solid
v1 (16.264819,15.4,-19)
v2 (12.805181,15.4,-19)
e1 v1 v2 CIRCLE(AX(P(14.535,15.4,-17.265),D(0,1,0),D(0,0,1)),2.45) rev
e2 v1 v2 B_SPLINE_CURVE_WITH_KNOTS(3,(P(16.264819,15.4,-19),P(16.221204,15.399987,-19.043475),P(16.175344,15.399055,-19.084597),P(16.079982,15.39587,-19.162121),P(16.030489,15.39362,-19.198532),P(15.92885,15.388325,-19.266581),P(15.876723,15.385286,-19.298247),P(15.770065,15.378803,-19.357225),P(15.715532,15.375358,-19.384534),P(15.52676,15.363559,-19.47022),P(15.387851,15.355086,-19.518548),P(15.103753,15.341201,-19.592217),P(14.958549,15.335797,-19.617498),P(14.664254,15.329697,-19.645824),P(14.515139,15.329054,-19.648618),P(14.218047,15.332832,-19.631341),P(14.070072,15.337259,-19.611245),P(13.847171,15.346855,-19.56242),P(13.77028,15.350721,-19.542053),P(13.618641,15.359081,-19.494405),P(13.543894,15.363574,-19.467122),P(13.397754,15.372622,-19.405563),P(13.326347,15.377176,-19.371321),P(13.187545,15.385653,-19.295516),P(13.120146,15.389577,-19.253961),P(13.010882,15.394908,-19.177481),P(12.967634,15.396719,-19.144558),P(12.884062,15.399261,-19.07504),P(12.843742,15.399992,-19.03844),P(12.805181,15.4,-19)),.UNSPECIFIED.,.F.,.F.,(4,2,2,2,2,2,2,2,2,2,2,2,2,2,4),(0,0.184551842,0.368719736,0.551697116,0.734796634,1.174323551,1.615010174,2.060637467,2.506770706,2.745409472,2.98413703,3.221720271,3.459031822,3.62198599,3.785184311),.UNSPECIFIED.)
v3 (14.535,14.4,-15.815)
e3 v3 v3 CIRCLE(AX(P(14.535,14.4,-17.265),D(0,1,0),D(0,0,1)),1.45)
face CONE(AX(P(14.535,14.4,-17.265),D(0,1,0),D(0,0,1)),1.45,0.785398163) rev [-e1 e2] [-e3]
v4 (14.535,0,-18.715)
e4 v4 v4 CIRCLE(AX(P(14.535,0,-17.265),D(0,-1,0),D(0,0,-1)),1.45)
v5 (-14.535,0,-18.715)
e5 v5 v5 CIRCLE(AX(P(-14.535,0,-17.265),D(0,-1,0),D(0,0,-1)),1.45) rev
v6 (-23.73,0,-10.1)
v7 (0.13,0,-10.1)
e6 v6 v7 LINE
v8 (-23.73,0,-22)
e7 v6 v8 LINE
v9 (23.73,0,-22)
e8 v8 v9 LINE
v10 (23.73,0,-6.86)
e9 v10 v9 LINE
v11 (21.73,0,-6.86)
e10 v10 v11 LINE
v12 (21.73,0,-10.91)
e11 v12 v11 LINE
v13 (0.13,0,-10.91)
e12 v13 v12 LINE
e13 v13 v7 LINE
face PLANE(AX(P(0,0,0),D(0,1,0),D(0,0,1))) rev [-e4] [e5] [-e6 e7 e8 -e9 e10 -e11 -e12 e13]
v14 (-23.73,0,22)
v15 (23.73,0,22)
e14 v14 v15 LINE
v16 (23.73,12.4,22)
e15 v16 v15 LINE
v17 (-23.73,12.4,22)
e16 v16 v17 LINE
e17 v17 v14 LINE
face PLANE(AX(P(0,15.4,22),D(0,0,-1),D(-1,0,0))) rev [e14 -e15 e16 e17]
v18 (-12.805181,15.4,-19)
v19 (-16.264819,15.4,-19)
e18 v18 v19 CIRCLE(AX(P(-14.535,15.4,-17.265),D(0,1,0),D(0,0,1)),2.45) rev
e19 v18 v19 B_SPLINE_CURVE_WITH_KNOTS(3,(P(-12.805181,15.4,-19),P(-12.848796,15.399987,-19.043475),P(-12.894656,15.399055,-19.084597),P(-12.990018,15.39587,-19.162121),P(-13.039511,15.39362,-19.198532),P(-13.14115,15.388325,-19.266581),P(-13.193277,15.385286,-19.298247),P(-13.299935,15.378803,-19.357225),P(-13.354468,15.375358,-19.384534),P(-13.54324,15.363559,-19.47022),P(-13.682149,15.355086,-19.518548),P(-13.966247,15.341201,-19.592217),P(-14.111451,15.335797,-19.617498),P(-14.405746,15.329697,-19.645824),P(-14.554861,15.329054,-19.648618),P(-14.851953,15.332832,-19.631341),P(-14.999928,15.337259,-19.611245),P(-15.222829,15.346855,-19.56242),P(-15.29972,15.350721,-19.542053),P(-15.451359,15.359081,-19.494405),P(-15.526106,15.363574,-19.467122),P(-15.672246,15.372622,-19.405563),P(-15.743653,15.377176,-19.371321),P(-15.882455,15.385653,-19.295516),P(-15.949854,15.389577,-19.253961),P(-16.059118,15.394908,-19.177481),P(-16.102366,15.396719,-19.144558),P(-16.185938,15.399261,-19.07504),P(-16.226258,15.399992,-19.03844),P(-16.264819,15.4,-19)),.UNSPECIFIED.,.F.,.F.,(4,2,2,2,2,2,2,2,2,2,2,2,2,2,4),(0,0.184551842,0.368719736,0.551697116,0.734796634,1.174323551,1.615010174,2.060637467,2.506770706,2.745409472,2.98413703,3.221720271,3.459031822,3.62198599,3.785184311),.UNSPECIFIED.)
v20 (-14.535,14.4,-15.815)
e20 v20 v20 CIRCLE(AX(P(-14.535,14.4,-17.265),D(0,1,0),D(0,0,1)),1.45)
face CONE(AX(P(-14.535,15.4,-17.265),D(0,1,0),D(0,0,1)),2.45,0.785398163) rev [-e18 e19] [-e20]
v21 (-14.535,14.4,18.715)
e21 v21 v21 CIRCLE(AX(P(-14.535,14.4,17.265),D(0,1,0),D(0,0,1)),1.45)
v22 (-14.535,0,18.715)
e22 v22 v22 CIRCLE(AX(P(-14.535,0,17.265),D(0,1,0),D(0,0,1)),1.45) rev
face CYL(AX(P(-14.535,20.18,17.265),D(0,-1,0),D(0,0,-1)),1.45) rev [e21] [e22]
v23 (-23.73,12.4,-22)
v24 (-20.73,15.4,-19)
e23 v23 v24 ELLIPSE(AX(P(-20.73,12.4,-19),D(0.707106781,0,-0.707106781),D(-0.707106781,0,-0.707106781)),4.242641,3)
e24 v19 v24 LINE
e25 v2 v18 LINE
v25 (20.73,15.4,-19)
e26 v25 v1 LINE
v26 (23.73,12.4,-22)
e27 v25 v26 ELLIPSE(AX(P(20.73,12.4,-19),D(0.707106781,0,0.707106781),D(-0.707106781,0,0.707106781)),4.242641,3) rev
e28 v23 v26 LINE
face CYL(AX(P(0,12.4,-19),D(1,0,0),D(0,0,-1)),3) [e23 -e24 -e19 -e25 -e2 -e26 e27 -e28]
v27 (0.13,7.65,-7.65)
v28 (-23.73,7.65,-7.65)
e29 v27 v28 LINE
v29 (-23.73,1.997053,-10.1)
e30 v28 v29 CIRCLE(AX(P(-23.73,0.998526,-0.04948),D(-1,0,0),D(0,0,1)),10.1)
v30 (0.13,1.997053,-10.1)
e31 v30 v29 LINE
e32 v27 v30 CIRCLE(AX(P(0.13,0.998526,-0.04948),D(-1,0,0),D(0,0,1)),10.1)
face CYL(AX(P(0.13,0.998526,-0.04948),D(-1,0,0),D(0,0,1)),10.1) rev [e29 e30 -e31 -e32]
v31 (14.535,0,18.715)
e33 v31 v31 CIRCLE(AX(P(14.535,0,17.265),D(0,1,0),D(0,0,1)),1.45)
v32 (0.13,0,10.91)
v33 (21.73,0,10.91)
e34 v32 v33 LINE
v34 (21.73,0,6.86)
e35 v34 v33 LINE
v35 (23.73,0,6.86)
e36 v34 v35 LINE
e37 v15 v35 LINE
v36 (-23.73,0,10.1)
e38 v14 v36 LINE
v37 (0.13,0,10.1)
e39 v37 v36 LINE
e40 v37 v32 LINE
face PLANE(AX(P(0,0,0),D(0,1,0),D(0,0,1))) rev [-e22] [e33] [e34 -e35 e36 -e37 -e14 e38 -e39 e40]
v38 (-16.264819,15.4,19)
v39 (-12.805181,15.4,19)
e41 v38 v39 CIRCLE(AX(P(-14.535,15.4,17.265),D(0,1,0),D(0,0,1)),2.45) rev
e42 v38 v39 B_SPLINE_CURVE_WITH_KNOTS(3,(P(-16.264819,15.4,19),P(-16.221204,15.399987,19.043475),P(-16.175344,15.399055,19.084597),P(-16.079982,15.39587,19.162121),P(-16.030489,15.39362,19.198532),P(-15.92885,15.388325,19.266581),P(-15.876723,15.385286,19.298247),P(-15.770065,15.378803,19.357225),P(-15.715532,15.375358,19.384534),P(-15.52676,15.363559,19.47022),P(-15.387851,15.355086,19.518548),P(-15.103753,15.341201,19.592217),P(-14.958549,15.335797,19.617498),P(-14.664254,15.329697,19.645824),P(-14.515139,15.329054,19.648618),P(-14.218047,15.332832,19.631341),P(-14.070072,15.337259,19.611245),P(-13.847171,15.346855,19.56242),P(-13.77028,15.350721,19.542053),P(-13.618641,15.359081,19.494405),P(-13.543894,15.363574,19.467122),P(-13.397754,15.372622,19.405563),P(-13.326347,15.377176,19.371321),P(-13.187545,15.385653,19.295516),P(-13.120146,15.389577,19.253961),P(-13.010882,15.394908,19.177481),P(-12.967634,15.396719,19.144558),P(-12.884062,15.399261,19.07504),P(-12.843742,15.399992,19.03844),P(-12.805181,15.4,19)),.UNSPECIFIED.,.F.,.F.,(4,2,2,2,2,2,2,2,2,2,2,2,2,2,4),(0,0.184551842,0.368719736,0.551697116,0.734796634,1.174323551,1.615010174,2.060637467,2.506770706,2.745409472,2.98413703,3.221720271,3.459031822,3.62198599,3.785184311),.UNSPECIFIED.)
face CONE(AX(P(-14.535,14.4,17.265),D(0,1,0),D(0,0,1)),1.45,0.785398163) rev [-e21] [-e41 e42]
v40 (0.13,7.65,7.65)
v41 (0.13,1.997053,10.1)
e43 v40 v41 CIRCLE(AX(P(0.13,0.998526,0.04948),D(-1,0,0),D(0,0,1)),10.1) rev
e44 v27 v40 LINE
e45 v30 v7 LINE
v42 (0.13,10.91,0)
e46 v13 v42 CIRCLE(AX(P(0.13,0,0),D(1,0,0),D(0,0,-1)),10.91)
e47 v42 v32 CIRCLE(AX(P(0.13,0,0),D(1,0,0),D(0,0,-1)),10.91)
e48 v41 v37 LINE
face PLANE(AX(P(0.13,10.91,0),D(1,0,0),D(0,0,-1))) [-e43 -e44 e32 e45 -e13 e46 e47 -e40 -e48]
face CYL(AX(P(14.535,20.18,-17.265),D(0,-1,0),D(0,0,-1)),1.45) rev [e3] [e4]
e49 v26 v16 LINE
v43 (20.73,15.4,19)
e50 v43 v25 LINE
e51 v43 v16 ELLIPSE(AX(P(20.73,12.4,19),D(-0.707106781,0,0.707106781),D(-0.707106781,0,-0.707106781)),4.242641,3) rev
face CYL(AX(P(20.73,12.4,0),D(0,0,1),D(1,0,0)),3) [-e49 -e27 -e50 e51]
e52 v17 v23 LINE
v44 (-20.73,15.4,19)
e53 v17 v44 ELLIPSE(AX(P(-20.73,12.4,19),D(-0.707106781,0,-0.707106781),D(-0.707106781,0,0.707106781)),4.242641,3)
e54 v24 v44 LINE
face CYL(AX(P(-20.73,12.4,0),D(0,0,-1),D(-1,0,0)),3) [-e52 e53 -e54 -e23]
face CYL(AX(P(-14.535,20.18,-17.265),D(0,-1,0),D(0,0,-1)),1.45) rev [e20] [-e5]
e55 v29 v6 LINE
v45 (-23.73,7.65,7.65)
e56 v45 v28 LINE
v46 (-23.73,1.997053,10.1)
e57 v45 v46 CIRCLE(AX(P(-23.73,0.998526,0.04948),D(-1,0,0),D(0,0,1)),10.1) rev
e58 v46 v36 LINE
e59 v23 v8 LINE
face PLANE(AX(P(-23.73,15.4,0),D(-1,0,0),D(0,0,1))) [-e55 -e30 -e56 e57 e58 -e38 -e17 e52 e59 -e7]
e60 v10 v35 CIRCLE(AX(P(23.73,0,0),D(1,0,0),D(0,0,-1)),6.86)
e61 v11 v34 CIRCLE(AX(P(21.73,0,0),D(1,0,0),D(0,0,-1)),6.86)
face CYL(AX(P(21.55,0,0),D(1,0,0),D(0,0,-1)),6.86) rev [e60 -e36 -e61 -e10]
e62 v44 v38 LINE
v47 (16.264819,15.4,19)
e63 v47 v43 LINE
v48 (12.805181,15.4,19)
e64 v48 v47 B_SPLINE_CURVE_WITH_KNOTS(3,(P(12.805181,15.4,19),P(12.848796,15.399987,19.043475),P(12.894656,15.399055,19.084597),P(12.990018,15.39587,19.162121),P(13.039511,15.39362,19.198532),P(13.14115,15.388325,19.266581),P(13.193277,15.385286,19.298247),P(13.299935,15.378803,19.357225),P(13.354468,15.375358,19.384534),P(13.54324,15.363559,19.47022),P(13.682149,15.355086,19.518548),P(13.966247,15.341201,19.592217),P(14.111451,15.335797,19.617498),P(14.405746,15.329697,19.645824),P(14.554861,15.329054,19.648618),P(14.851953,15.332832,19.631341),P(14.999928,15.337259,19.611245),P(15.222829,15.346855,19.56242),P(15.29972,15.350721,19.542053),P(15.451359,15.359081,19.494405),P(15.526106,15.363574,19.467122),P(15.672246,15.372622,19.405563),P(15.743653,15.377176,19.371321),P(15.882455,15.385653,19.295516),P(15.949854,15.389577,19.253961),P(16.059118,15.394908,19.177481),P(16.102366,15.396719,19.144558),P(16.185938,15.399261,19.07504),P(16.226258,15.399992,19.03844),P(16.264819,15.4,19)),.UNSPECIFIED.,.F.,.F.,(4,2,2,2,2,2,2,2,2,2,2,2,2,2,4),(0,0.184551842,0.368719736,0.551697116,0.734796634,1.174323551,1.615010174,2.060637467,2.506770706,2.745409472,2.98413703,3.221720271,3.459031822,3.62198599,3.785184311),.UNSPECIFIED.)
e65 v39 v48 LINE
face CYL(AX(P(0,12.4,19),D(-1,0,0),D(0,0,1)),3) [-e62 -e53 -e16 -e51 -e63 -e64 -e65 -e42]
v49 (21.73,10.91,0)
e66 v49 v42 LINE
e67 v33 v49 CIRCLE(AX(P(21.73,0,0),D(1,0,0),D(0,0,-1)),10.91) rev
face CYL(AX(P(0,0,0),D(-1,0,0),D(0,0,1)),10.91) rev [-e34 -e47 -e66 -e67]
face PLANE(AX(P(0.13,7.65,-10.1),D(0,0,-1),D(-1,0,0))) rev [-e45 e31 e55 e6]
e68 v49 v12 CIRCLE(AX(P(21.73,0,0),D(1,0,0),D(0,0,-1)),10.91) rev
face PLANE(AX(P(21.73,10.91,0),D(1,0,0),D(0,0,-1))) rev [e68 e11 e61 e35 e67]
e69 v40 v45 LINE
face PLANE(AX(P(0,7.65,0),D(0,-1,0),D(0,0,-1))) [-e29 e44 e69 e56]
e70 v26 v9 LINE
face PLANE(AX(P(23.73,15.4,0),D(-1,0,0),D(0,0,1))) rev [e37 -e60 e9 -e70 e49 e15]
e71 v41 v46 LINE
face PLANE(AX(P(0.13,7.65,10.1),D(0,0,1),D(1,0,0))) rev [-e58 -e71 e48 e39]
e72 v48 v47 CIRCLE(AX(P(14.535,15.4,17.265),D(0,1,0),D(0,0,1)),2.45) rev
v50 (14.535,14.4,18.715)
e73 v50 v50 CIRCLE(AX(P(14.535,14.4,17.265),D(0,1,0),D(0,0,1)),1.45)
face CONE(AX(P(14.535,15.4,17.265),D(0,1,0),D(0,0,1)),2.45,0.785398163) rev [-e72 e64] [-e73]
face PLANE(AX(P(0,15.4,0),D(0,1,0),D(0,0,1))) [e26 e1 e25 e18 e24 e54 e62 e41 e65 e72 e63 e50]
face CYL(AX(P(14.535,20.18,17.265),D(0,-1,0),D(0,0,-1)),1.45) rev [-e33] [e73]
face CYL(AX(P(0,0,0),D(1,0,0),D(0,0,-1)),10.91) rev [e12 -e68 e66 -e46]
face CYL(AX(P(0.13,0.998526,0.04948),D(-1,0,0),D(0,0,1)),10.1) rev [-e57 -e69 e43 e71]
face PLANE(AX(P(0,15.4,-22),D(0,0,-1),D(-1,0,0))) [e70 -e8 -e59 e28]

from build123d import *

# Parameters (mm, degrees)
SKETCH1_W           = 47.46
SKETCH1_H           = 44
BOSS_EXTRUDE1_DEPTH = 15.4
SKETCH2_W           = 21.6
SKETCH2_H           = 21.82
CUT_EXTRUDE1_DEPTH  = 10.91
FILLET1_R           = 10.91
SKETCH4_W           = 23.86
SKETCH4_H           = 20.2
CUT_EXTRUDE2_DEPTH  = 7.65
SKETCH8_R           = 1.45
CUT_EXTRUDE3_DEPTH  = 20.18
CHAMFER1_SIZE       = 1
FILLET2_R           = 3
SKETCH9_R           = 6.86
CUT_EXTRUDE4_DEPTH  = 2.18
BOSS_EXTRUDE3_DEPTH = 23.86


# Some blends are built 0.0001 mm under size
with BuildPart() as part:
    # Sketch1 → Boss-Extrude1 (new body)
    with BuildSketch(Plane(origin=(0, 0, 0), x_dir=(1, 0, 0), z_dir=(0, 1, 0))):
        Rectangle(SKETCH1_W, SKETCH1_H)
    extrude(amount=BOSS_EXTRUDE1_DEPTH)

    # Sketch2 → Cut-Extrude1 (cut)
    with BuildSketch(Plane.XZ):
        with Locations((10.93, 0)):
            Rectangle(SKETCH2_W, SKETCH2_H)
    extrude(amount=-CUT_EXTRUDE1_DEPTH, mode=Mode.SUBTRACT)

    # Fillet1
    fillet1_edges = [part.edges().sort_by_distance(p)[0] for p in [
        (10.93, 10.91, -10.91),
        (10.93, 10.91, 10.91),
    ]]
    fillet(fillet1_edges, radius=FILLET1_R - 0.0001)  # a hair under: the kernel refuses the full size

    # Sketch4 → Cut-Extrude2 (cut)
    with BuildSketch(Plane.XZ):
        with Locations((-11.8, 0)):
            Rectangle(SKETCH4_W, SKETCH4_H)
    extrude(amount=-CUT_EXTRUDE2_DEPTH, mode=Mode.SUBTRACT)

    # Sketch8 → Cut-Extrude3 (cut)
    with BuildSketch(Plane.XZ):
        with Locations(Location((14.535, -17.265, 0), (0, 0, 270))):
            Circle(SKETCH8_R)
        with Locations(Location((-14.535, -17.265, 0), (0, 0, 270))):
            Circle(SKETCH8_R)
    cut_extrude3 = extrude(amount=-CUT_EXTRUDE3_DEPTH, mode=Mode.SUBTRACT)

    # Mirror1: Cut-Extrude3 across plane
    add(cut_extrude3.mirror(Plane(origin=(0, 0, 0), x_dir=(1, 0, 0), z_dir=(0, 0, -1))), mode=Mode.SUBTRACT)

    # Chamfer1
    chamfer1_edges = [part.edges().sort_by_distance(p)[0] for p in [
        (14.535, 15.4, -15.815),
        (-14.535, 15.4, -15.815),
        (14.535, 15.4, 15.815),
        (-14.535, 15.4, 15.815),
    ]]
    chamfer(chamfer1_edges, length=CHAMFER1_SIZE)

    # Fillet2
    # the kernel refuses this fillet: 3 mm, written as the material it takes off along each edge
    with BuildSketch(Plane(origin=(23.73, 15.4, 29.5), x_dir=(-1, 0, 0), z_dir=(0, 0, -1)), Plane(origin=(-23.73, 15.4, -29.5), x_dir=(1, 0, 0), z_dir=(0, 0, 1))) as fillet2_piece_1:
        with BuildLine():
            CenterArc((FILLET2_R, -FILLET2_R), FILLET2_R, 90, 90)
            Line((0, -FILLET2_R), (0, 0))
            Line((0, 0), (FILLET2_R, 0))
        make_face()
    extrude(amount=59, mode=Mode.SUBTRACT)
    with BuildSketch(Plane(origin=(31.23, 15.4, -22), x_dir=(0, 0, 1), z_dir=(-1, 0, 0)), Plane(origin=(-31.23, 15.4, 22), x_dir=(0, 0, -1), z_dir=(1, 0, 0))) as fillet2_piece_2:
        with BuildLine():
            CenterArc((FILLET2_R, -FILLET2_R), FILLET2_R, 90, 90)
            Line((0, -FILLET2_R), (0, 0))
            Line((0, 0), (FILLET2_R, 0))
        make_face()
    extrude(amount=62.46, mode=Mode.SUBTRACT)

    # Sketch9 → Cut-Extrude4 (cut)
    with BuildSketch(Plane(origin=(23.73, 0, 0), x_dir=(0, 0, -1), z_dir=(1, 0, 0))):
        Circle(SKETCH9_R)
    extrude(amount=-CUT_EXTRUDE4_DEPTH, mode=Mode.SUBTRACT)

    # Sketch10 → Boss-Extrude3 (add)
    with BuildSketch(Plane.ZY.offset(23.73)):
        with BuildLine():
            Line((-7.65, 7.65), (-10.1, 7.65))
            Line((-10.1, 7.65), (-10.1, 1.997052779))
            ThreePointArc((-10.1, 1.997052779), (-9.316559187, 5.014899131), (-7.65, 7.65))
        make_face()
        with BuildLine():
            Line((10.1, 1.997052779), (10.1, 7.65))
            Line((10.1, 7.65), (7.65, 7.65))
            ThreePointArc((7.65, 7.65), (9.316559187, 5.014899131), (10.1, 1.997052779))
        make_face()
    extrude(amount=-BOSS_EXTRUDE3_DEPTH)


solid = part.part
